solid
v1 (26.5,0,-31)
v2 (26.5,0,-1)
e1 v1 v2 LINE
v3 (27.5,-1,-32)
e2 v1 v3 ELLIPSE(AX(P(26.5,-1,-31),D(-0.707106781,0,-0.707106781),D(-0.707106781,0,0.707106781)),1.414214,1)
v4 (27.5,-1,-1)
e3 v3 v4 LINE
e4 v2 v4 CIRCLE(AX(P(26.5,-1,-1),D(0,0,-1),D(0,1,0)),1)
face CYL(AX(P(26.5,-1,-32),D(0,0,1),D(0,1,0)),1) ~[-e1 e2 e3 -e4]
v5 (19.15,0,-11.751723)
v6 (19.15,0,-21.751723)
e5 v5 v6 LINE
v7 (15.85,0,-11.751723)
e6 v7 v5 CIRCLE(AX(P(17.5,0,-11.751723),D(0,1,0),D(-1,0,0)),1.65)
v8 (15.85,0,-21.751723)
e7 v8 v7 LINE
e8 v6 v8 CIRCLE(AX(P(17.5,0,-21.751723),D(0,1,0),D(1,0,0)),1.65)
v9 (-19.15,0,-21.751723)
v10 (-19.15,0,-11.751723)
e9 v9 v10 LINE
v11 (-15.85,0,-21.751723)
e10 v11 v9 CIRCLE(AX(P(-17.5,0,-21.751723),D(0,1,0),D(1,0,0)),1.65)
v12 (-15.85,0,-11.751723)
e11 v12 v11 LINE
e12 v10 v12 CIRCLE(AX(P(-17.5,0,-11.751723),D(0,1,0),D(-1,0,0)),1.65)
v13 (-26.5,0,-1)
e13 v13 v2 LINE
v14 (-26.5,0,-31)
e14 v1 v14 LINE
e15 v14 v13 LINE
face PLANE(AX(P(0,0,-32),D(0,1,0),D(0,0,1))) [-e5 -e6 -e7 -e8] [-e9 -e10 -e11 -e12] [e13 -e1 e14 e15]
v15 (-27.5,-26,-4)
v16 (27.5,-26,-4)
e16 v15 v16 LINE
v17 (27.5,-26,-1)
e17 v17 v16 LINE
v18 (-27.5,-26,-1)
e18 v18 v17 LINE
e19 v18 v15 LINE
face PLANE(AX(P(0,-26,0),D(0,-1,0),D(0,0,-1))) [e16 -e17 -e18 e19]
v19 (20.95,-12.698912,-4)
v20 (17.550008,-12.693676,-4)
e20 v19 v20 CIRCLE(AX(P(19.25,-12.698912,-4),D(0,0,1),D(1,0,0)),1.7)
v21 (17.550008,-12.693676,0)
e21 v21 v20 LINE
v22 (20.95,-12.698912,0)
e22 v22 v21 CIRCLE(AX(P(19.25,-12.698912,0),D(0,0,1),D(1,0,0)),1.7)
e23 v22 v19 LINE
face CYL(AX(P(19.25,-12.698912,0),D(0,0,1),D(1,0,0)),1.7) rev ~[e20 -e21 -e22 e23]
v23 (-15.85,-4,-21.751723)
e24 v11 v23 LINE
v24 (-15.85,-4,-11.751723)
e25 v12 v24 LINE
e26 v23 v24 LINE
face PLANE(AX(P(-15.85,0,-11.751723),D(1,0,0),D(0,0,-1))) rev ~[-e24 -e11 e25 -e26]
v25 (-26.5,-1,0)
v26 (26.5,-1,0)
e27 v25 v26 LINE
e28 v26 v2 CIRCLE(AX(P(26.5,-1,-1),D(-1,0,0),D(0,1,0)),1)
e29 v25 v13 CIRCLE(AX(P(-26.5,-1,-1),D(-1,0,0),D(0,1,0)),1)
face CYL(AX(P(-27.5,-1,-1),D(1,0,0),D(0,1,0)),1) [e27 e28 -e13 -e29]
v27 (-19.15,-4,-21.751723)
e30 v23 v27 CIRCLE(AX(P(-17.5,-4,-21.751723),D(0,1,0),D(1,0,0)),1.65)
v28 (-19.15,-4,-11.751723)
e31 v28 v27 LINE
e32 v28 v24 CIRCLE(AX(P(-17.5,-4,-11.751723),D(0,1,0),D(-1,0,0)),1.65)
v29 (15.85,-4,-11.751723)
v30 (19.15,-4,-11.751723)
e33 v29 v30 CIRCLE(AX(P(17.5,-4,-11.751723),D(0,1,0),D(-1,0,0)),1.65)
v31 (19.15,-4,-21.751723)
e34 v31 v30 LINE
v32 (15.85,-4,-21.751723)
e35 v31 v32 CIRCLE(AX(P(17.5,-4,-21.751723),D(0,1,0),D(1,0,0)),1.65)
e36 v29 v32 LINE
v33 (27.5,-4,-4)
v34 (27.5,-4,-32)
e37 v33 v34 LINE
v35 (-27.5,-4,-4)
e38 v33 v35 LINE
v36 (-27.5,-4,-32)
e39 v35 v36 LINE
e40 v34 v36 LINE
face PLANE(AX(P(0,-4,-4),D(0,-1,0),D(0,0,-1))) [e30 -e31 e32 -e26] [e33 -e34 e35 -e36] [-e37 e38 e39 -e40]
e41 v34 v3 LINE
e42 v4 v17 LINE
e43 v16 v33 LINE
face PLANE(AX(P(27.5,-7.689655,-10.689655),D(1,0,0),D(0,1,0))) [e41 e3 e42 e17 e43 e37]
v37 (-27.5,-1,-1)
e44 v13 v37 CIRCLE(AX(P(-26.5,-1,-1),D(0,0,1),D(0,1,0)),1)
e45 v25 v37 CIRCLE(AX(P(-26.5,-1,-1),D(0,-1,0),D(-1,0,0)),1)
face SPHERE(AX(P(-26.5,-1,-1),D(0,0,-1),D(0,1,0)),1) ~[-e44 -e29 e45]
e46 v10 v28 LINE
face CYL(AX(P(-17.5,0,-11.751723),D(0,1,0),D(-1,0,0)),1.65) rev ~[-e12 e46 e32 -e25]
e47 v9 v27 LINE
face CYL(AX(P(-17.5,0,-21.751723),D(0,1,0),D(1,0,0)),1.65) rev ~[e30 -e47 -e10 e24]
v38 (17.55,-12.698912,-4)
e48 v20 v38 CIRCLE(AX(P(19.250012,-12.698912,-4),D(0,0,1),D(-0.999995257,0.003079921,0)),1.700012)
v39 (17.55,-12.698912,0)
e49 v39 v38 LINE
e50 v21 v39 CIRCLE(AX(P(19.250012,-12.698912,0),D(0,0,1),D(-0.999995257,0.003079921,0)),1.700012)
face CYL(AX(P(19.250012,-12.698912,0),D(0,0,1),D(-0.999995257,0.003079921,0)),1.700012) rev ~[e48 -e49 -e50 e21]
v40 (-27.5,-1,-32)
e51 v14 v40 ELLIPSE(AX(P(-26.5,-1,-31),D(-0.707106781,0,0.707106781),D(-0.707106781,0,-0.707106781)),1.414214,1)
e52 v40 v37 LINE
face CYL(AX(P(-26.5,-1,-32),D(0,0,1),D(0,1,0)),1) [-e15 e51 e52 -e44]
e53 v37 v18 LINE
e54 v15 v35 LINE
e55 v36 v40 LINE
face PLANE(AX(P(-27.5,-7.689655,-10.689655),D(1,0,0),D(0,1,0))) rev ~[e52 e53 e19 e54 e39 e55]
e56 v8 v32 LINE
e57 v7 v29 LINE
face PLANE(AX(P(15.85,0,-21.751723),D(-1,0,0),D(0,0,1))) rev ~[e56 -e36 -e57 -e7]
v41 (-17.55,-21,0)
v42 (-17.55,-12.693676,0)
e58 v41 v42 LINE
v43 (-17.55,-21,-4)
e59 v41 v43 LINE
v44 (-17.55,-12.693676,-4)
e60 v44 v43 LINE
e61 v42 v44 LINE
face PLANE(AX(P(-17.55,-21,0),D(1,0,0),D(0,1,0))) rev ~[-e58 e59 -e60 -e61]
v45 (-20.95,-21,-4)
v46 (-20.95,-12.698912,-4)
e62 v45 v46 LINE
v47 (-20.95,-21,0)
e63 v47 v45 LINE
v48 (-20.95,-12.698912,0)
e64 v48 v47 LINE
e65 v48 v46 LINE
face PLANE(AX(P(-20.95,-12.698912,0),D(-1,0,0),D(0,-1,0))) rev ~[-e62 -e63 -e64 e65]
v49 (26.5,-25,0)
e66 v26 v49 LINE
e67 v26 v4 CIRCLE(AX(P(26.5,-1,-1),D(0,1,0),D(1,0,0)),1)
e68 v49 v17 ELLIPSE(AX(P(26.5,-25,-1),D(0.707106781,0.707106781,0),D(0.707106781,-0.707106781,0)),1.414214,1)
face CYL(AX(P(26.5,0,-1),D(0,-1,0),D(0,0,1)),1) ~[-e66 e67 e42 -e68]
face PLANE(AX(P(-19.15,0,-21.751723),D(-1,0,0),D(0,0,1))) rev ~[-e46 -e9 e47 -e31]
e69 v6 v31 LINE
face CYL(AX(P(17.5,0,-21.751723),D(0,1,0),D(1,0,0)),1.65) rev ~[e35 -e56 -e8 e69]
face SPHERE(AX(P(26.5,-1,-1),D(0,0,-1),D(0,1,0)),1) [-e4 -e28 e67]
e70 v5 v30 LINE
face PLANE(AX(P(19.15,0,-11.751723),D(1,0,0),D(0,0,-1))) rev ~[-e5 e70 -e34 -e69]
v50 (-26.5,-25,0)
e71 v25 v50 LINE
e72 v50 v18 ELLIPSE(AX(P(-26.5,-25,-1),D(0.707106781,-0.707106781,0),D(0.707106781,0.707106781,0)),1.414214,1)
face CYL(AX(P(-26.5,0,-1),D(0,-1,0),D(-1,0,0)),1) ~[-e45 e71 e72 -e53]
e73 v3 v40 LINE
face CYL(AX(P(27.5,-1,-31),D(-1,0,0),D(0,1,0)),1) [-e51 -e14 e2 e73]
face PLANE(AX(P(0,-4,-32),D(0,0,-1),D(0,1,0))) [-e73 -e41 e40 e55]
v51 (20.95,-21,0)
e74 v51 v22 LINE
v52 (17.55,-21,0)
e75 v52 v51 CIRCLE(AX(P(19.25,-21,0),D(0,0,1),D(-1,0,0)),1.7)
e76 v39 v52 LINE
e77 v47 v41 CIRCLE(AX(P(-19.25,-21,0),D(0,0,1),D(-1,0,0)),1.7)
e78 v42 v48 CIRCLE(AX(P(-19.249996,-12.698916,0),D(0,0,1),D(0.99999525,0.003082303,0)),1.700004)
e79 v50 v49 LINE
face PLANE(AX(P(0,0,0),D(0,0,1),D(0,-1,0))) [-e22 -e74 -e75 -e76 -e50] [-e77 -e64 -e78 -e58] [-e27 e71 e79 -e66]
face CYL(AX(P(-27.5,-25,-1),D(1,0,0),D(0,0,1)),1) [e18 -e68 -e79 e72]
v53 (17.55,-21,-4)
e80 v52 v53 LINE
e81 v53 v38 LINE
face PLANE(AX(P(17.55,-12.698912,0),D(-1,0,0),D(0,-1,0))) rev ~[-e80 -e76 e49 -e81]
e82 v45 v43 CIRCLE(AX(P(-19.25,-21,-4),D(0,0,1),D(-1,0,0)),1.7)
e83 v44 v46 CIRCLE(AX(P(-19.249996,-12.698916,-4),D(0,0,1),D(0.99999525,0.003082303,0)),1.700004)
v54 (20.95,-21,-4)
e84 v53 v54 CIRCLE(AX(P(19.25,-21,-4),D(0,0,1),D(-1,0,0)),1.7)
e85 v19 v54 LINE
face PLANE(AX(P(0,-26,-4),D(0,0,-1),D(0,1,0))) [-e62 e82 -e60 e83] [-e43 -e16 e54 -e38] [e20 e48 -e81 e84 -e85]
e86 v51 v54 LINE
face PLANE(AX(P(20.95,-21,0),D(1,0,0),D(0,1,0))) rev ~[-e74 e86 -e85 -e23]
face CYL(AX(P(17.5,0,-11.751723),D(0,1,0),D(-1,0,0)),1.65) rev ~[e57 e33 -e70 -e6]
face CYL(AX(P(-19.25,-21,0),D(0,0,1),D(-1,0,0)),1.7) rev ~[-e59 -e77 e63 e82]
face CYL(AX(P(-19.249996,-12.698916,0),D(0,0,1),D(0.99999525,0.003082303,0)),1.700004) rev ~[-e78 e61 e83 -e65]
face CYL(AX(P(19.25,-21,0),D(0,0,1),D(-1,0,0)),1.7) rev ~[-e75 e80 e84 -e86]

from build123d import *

# Parameters (mm, degrees)
F1_DEPTH = 27.5
F3_DEPTH = 32.001
F4_R     = 1
F6_DEPTH = 26.001


# Not quite as in the source:
# - ends of sketch curves that miss each other by under 0.0002 mm in the source are joined
# - a feature names something its author has since deleted; it is built from what else it names


with BuildPart() as f1:
    # F0 (on Right) → F1 (new body, symmetric)
    with BuildSketch(Plane.YZ):
        Polygon((0, -32), (0, 0), (-26, 0), (-26, -4), (-4, -4), (-4, -32), align=None)
    extrude(amount=F1_DEPTH, both=True)

    # F2 (on Top) → F3 (cut, through all)
    with BuildSketch(Plane.XY):
        with BuildLine():
            Line((-17.55, -21), (-20.95, -21))
            ThreePointArc((-20.95, -21), (-19.25, -22.7), (-17.55, -21))
        make_face()
        with BuildLine():
            Line((-20.95, -12.6989117458), (-20.95, -21))
            Line((-20.95, -21), (-17.55, -21))
            Line((-17.55, -21), (-17.55, -12.6989117458))
            Line((-17.55, -12.6989117458), (-17.55, -12.6936758503))
            ThreePointArc((-17.55, -12.6936758503), (-19.2526179384, -10.9989137616), (-20.95, -12.6989117458))
        make_face()
        with BuildLine():
            ThreePointArc((17.55, -21), (19.25, -22.7), (20.95, -21))
            Line((20.95, -21), (17.55, -21))
        make_face()
        with BuildLine():
            Line((17.55, -21), (20.95, -21))
            Line((20.95, -21), (20.95, -12.6989117458))
            ThreePointArc((20.95, -12.6989117458), (19.2526179384, -10.9989137616), (17.5500080631, -12.6936758752))
            ThreePointArc((17.5500080631, -12.6936758752), (17.5500020158, -12.6962938074), (17.55, -12.6989117458))
            Line((17.55, -12.6989117458), (17.55, -21))
        make_face()
    extrude(amount=-F3_DEPTH, mode=Mode.SUBTRACT)

    # F4
    f4_edges = [f1.edges().sort_by_distance(p)[0] for p in [
        (0, 0, -32),
        (-27.5, 0, -16),
        (27.5, 0, -16),
        (0, 0, 0),
        (0, -26, 0),
        (-27.5, -13, 0),
        (27.5, -13, 0),
    ]]
    fillet(f4_edges, radius=F4_R)

    # F5 (on face) → F6 (cut, through all)
    with BuildSketch(Plane(origin=(0, 0, 0), x_dir=(-1, 0, 0), z_dir=(0, 1, 0))):
        with BuildLine():
            Line((15.85, -11.7517232777), (15.85, -21.7517232777))
            ThreePointArc((15.85, -21.7517232777), (17.5, -23.4017232777), (19.15, -21.7517232777))
            Line((19.15, -21.7517232777), (19.15, -11.7517232777))
            ThreePointArc((19.15, -11.7517232777), (17.5, -10.1017232777), (15.85, -11.7517232777))
        make_face()
        with BuildLine():
            ThreePointArc((-19.15, -21.7517232777), (-17.5, -23.4017232777), (-15.85, -21.7517232777))
            Line((-15.85, -21.7517232777), (-15.85, -11.7517232777))
            ThreePointArc((-15.85, -11.7517232777), (-17.5, -10.1017232777), (-19.15, -11.7517232777))
            Line((-19.15, -11.7517232777), (-19.15, -21.7517232777))
        make_face()
    extrude(amount=-F6_DEPTH, mode=Mode.SUBTRACT)


solid = f1.part
